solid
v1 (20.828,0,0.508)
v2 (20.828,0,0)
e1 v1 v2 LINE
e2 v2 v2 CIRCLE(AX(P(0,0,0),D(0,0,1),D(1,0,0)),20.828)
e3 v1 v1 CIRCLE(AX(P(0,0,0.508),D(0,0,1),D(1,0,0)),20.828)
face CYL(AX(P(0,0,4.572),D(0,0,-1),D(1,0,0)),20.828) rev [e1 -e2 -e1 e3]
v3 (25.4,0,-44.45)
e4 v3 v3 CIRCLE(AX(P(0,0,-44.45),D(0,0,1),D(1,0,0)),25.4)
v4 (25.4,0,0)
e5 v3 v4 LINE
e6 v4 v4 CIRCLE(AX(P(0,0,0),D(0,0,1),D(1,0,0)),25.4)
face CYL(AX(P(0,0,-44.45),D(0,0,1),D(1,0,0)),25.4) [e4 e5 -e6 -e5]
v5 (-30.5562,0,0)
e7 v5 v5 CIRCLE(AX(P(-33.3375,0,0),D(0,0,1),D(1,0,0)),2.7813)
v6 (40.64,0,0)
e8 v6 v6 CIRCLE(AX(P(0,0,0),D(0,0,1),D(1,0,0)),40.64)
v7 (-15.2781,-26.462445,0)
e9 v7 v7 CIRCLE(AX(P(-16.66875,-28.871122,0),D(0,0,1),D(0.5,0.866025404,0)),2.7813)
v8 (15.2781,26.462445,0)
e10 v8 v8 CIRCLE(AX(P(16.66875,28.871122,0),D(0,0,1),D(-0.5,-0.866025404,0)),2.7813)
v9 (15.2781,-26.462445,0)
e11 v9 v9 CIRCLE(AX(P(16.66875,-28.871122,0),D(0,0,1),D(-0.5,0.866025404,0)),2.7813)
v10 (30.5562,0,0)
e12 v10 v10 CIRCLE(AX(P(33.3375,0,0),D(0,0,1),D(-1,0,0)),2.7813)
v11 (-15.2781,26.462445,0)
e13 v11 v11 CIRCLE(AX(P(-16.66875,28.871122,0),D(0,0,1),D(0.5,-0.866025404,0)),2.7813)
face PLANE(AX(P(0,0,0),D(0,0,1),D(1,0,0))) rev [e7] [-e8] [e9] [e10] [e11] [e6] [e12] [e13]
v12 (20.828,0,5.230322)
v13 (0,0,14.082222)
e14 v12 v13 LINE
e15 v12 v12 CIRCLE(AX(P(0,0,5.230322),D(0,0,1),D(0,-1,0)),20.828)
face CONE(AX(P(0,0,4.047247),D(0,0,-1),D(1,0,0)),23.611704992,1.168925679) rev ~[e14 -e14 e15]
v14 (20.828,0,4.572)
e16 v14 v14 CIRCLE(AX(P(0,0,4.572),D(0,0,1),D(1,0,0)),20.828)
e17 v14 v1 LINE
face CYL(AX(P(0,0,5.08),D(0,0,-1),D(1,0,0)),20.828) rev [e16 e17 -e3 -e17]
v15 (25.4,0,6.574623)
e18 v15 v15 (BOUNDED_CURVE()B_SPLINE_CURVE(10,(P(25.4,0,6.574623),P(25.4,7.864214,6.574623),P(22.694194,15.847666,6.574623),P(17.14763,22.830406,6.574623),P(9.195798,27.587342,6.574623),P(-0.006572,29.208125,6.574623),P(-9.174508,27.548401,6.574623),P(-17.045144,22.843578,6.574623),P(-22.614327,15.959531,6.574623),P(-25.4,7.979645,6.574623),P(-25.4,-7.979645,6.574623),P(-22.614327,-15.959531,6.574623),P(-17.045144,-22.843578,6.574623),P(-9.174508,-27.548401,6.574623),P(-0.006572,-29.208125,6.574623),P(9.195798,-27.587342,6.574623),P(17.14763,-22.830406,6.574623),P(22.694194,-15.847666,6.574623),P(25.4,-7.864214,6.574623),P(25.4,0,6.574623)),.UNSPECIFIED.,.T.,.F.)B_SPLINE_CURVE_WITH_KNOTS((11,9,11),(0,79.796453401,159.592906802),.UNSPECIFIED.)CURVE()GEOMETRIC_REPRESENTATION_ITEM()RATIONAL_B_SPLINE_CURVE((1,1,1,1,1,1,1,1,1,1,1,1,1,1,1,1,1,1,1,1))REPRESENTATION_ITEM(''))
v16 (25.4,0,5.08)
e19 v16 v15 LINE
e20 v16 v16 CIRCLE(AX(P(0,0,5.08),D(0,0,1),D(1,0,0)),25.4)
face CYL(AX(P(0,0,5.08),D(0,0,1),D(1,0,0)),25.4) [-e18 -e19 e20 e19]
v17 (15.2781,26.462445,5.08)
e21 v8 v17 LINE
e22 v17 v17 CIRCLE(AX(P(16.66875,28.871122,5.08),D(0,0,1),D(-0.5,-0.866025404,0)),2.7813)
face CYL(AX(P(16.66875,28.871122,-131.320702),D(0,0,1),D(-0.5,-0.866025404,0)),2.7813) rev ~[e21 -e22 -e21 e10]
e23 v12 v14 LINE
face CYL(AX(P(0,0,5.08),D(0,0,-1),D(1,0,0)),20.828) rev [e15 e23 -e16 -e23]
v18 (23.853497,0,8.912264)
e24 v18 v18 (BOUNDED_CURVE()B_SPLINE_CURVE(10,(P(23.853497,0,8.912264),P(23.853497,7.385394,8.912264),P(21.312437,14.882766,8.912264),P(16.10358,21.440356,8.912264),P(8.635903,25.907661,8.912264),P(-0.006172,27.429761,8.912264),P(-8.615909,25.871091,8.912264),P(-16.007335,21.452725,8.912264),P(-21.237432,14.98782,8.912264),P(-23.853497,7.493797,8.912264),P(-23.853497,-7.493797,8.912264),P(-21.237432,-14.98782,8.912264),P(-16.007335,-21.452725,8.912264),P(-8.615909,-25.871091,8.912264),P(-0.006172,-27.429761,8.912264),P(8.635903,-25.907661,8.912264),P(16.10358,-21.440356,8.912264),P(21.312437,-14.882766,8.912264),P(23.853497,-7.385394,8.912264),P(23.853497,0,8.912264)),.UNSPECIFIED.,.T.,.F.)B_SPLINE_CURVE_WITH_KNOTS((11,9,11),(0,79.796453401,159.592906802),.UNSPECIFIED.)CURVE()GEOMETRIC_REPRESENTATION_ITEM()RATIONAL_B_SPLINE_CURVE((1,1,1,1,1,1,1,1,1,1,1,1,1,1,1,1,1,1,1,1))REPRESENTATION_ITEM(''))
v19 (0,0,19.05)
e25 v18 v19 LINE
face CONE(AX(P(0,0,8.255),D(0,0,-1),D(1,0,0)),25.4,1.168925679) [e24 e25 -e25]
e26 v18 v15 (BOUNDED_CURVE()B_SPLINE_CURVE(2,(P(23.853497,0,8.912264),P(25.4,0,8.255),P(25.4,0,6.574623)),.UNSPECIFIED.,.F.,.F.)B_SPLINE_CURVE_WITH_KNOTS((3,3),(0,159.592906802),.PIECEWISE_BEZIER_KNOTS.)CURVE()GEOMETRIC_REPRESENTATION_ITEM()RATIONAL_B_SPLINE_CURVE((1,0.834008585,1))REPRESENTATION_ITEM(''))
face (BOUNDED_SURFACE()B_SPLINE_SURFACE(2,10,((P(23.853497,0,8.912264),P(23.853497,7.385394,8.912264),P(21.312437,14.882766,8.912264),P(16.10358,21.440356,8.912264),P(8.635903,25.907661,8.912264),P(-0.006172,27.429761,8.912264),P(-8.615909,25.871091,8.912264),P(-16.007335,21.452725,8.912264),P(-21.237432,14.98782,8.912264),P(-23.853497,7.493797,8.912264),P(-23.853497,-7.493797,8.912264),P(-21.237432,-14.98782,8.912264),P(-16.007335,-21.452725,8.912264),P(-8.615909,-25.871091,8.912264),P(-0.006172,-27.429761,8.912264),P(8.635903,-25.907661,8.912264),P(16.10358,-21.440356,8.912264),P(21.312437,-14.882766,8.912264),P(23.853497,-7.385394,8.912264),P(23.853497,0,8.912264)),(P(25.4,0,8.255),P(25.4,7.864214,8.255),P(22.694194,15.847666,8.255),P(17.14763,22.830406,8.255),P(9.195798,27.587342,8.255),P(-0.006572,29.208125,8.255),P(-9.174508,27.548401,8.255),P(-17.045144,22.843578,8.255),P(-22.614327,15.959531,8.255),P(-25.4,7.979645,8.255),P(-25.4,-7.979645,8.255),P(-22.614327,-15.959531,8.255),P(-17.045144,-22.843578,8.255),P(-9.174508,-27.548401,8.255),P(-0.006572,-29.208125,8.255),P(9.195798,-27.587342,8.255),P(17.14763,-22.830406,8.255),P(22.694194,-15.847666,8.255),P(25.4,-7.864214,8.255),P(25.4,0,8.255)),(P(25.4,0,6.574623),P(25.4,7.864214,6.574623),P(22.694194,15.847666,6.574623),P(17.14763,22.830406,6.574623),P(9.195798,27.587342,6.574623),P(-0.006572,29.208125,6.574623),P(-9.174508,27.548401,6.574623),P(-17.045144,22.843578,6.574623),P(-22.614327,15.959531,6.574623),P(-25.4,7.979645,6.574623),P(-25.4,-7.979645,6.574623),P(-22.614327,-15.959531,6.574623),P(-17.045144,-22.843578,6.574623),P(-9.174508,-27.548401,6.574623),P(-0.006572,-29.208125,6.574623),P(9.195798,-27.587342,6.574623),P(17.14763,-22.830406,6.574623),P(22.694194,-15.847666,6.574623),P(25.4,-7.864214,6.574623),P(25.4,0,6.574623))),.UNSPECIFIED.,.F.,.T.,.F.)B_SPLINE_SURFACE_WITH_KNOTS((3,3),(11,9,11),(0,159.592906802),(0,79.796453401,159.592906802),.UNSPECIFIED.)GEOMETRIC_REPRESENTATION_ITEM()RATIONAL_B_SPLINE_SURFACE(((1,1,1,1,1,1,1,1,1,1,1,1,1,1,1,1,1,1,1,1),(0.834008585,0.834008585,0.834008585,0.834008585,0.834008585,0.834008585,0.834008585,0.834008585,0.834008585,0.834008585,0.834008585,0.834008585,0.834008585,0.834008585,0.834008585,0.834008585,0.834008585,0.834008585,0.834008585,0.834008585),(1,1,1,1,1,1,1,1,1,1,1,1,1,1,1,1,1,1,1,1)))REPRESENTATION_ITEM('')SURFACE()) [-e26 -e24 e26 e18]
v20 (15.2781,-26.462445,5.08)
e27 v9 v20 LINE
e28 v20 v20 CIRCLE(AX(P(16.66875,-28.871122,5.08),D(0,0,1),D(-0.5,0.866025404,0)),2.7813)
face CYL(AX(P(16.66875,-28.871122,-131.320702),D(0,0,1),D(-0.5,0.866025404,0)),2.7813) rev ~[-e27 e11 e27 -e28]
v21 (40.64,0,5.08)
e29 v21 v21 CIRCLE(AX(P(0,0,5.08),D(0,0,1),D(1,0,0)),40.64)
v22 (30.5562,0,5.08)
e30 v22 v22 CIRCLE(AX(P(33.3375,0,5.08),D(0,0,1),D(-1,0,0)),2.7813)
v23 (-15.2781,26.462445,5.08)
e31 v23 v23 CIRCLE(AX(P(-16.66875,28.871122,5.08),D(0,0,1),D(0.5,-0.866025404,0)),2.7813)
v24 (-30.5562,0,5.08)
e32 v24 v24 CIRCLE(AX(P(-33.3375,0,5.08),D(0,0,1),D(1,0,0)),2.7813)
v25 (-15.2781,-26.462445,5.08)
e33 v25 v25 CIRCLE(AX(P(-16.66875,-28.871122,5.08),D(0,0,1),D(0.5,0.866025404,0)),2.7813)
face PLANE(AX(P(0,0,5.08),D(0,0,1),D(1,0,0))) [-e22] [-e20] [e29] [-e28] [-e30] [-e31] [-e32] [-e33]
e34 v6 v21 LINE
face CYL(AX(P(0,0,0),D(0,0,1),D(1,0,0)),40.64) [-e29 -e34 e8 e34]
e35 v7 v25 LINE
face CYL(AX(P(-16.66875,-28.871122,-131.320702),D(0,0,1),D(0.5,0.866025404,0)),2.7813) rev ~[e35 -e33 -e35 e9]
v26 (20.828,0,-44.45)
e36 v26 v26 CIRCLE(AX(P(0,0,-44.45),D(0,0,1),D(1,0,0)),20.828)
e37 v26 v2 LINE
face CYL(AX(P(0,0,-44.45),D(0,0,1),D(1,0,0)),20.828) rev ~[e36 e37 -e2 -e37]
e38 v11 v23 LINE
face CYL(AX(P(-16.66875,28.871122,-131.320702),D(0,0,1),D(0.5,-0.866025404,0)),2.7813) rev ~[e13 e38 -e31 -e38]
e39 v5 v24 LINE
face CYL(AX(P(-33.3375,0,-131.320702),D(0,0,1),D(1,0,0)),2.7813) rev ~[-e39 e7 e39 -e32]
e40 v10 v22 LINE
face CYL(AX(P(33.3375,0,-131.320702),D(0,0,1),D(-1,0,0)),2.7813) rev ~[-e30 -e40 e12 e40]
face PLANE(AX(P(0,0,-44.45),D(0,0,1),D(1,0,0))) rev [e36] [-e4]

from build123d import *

# Parameters (mm, degrees)
F3_D            = 5.5626
F3_COPIES_COUNT = 6
F4_R            = 2.54
F5_T            = 4.572


# Not quite as in the source:
# - a pattern or mirror of a feature is missing from the dataset's text; its kind, count and spacing are read off the source's solid
# - a shell that OpenCascade refuses in one call is made with other operations: the cavity is built on its own and cut out


with BuildPart() as f2:
    # F1 (on Front) → F2 (revolve)
    with BuildSketch(Plane.XZ):
        Polygon((25.4, 8.255), (0, 19.05), (0, -44.45), (25.4, -44.45), (25.4, 0), (40.64, 0), (40.64, 5.08), (25.4, 5.08), align=None)
    revolve(axis=Axis((0, 0, -12.7), (0, 0, 1)))

    # F3 (through all)
    with Locations(Plane(origin=(0, 0, 0), x_dir=(1, 0, 0), z_dir=(0, 0, -1))):
        with Locations((33.3375, 0)):
            f3 = Hole(F3_D / 2)

    # F3_copies: F3 ×6 about axis
    f3_copies_axis = Axis((0, 0, 0), (0, 0, 1))
    for i in range(1, F3_COPIES_COUNT):
        add(f3.rotate(f3_copies_axis, i * 360 / F3_COPIES_COUNT), mode=Mode.SUBTRACT)

    # F4
    f4_edges = [f2.edges().sort_by_distance(p)[0] for p in [
        (-25.4, 0, 8.255),
    ]]
    fillet(f4_edges, radius=F4_R)

    # F5: shell of thickness 4.572, made by hand


with BuildPart() as f5_core1:
    # F5_t2: copy of F2
    add(f2.part)

    # the walls: a layer under each face that stays
    f5_faces = [f5_core1.faces().sort_by_distance(p)[0] for p in [
        (-25.4, 0, 5.8273115729),
        (-24.9783818064, 0, 7.9760718686),
        (-27.0933333333, -27.0933333333, 5.08),
        (-11.9267486132, 0, 13.9811318394),
        (-40.64, 0, 2.54),
        (-15.2781, -26.4624454431, 2.54),
        (15.2781, -26.4624454431, 2.54),
        (30.5562, 0, 2.54),
        (-30.5562, 0, 2.54),
        (-15.2781, 26.4624454431, 2.54),
        (15.2781, 26.4624454431, 2.54),
        (27.0933333333, -27.0933333333, 0),
        (-25.4, 0, -22.225),
    ]]
    thicken(f5_faces, amount=-F5_T, mode=Mode.SUBTRACT)

    # F5_s3 → F5_t4 (revolve, cut)
    with BuildSketch(Plane.XZ):
        Polygon((25.44572, 5.12572), (20.828, 5.08), (20.828, 0.508), (25.4, 0.508), align=None)
    revolve(axis=Axis((0, 0, 5.08), (0, 0, 1)), mode=Mode.SUBTRACT)

    # F5_s5 → F5_t6 (revolve, cut)
    with BuildSketch(Plane.XZ):
        Polygon((25.44572, -0.04572), (25.4, 4.572), (20.828, 4.572), (20.828, 0), align=None)
    revolve(axis=Axis((0, 0, 0), (0, 0, 1)), mode=Mode.SUBTRACT)


with BuildPart() as f2_1:
    add(f2.part)

    # what is left inside the walls is the cavity
    f5_cavity = [f5_core1.part.solids().sort_by_distance(p)[0] for p in [
        (-20.78228, 0, -29.633333),
    ]]
    add(f5_cavity, mode=Mode.SUBTRACT)


solid = f2_1.part
